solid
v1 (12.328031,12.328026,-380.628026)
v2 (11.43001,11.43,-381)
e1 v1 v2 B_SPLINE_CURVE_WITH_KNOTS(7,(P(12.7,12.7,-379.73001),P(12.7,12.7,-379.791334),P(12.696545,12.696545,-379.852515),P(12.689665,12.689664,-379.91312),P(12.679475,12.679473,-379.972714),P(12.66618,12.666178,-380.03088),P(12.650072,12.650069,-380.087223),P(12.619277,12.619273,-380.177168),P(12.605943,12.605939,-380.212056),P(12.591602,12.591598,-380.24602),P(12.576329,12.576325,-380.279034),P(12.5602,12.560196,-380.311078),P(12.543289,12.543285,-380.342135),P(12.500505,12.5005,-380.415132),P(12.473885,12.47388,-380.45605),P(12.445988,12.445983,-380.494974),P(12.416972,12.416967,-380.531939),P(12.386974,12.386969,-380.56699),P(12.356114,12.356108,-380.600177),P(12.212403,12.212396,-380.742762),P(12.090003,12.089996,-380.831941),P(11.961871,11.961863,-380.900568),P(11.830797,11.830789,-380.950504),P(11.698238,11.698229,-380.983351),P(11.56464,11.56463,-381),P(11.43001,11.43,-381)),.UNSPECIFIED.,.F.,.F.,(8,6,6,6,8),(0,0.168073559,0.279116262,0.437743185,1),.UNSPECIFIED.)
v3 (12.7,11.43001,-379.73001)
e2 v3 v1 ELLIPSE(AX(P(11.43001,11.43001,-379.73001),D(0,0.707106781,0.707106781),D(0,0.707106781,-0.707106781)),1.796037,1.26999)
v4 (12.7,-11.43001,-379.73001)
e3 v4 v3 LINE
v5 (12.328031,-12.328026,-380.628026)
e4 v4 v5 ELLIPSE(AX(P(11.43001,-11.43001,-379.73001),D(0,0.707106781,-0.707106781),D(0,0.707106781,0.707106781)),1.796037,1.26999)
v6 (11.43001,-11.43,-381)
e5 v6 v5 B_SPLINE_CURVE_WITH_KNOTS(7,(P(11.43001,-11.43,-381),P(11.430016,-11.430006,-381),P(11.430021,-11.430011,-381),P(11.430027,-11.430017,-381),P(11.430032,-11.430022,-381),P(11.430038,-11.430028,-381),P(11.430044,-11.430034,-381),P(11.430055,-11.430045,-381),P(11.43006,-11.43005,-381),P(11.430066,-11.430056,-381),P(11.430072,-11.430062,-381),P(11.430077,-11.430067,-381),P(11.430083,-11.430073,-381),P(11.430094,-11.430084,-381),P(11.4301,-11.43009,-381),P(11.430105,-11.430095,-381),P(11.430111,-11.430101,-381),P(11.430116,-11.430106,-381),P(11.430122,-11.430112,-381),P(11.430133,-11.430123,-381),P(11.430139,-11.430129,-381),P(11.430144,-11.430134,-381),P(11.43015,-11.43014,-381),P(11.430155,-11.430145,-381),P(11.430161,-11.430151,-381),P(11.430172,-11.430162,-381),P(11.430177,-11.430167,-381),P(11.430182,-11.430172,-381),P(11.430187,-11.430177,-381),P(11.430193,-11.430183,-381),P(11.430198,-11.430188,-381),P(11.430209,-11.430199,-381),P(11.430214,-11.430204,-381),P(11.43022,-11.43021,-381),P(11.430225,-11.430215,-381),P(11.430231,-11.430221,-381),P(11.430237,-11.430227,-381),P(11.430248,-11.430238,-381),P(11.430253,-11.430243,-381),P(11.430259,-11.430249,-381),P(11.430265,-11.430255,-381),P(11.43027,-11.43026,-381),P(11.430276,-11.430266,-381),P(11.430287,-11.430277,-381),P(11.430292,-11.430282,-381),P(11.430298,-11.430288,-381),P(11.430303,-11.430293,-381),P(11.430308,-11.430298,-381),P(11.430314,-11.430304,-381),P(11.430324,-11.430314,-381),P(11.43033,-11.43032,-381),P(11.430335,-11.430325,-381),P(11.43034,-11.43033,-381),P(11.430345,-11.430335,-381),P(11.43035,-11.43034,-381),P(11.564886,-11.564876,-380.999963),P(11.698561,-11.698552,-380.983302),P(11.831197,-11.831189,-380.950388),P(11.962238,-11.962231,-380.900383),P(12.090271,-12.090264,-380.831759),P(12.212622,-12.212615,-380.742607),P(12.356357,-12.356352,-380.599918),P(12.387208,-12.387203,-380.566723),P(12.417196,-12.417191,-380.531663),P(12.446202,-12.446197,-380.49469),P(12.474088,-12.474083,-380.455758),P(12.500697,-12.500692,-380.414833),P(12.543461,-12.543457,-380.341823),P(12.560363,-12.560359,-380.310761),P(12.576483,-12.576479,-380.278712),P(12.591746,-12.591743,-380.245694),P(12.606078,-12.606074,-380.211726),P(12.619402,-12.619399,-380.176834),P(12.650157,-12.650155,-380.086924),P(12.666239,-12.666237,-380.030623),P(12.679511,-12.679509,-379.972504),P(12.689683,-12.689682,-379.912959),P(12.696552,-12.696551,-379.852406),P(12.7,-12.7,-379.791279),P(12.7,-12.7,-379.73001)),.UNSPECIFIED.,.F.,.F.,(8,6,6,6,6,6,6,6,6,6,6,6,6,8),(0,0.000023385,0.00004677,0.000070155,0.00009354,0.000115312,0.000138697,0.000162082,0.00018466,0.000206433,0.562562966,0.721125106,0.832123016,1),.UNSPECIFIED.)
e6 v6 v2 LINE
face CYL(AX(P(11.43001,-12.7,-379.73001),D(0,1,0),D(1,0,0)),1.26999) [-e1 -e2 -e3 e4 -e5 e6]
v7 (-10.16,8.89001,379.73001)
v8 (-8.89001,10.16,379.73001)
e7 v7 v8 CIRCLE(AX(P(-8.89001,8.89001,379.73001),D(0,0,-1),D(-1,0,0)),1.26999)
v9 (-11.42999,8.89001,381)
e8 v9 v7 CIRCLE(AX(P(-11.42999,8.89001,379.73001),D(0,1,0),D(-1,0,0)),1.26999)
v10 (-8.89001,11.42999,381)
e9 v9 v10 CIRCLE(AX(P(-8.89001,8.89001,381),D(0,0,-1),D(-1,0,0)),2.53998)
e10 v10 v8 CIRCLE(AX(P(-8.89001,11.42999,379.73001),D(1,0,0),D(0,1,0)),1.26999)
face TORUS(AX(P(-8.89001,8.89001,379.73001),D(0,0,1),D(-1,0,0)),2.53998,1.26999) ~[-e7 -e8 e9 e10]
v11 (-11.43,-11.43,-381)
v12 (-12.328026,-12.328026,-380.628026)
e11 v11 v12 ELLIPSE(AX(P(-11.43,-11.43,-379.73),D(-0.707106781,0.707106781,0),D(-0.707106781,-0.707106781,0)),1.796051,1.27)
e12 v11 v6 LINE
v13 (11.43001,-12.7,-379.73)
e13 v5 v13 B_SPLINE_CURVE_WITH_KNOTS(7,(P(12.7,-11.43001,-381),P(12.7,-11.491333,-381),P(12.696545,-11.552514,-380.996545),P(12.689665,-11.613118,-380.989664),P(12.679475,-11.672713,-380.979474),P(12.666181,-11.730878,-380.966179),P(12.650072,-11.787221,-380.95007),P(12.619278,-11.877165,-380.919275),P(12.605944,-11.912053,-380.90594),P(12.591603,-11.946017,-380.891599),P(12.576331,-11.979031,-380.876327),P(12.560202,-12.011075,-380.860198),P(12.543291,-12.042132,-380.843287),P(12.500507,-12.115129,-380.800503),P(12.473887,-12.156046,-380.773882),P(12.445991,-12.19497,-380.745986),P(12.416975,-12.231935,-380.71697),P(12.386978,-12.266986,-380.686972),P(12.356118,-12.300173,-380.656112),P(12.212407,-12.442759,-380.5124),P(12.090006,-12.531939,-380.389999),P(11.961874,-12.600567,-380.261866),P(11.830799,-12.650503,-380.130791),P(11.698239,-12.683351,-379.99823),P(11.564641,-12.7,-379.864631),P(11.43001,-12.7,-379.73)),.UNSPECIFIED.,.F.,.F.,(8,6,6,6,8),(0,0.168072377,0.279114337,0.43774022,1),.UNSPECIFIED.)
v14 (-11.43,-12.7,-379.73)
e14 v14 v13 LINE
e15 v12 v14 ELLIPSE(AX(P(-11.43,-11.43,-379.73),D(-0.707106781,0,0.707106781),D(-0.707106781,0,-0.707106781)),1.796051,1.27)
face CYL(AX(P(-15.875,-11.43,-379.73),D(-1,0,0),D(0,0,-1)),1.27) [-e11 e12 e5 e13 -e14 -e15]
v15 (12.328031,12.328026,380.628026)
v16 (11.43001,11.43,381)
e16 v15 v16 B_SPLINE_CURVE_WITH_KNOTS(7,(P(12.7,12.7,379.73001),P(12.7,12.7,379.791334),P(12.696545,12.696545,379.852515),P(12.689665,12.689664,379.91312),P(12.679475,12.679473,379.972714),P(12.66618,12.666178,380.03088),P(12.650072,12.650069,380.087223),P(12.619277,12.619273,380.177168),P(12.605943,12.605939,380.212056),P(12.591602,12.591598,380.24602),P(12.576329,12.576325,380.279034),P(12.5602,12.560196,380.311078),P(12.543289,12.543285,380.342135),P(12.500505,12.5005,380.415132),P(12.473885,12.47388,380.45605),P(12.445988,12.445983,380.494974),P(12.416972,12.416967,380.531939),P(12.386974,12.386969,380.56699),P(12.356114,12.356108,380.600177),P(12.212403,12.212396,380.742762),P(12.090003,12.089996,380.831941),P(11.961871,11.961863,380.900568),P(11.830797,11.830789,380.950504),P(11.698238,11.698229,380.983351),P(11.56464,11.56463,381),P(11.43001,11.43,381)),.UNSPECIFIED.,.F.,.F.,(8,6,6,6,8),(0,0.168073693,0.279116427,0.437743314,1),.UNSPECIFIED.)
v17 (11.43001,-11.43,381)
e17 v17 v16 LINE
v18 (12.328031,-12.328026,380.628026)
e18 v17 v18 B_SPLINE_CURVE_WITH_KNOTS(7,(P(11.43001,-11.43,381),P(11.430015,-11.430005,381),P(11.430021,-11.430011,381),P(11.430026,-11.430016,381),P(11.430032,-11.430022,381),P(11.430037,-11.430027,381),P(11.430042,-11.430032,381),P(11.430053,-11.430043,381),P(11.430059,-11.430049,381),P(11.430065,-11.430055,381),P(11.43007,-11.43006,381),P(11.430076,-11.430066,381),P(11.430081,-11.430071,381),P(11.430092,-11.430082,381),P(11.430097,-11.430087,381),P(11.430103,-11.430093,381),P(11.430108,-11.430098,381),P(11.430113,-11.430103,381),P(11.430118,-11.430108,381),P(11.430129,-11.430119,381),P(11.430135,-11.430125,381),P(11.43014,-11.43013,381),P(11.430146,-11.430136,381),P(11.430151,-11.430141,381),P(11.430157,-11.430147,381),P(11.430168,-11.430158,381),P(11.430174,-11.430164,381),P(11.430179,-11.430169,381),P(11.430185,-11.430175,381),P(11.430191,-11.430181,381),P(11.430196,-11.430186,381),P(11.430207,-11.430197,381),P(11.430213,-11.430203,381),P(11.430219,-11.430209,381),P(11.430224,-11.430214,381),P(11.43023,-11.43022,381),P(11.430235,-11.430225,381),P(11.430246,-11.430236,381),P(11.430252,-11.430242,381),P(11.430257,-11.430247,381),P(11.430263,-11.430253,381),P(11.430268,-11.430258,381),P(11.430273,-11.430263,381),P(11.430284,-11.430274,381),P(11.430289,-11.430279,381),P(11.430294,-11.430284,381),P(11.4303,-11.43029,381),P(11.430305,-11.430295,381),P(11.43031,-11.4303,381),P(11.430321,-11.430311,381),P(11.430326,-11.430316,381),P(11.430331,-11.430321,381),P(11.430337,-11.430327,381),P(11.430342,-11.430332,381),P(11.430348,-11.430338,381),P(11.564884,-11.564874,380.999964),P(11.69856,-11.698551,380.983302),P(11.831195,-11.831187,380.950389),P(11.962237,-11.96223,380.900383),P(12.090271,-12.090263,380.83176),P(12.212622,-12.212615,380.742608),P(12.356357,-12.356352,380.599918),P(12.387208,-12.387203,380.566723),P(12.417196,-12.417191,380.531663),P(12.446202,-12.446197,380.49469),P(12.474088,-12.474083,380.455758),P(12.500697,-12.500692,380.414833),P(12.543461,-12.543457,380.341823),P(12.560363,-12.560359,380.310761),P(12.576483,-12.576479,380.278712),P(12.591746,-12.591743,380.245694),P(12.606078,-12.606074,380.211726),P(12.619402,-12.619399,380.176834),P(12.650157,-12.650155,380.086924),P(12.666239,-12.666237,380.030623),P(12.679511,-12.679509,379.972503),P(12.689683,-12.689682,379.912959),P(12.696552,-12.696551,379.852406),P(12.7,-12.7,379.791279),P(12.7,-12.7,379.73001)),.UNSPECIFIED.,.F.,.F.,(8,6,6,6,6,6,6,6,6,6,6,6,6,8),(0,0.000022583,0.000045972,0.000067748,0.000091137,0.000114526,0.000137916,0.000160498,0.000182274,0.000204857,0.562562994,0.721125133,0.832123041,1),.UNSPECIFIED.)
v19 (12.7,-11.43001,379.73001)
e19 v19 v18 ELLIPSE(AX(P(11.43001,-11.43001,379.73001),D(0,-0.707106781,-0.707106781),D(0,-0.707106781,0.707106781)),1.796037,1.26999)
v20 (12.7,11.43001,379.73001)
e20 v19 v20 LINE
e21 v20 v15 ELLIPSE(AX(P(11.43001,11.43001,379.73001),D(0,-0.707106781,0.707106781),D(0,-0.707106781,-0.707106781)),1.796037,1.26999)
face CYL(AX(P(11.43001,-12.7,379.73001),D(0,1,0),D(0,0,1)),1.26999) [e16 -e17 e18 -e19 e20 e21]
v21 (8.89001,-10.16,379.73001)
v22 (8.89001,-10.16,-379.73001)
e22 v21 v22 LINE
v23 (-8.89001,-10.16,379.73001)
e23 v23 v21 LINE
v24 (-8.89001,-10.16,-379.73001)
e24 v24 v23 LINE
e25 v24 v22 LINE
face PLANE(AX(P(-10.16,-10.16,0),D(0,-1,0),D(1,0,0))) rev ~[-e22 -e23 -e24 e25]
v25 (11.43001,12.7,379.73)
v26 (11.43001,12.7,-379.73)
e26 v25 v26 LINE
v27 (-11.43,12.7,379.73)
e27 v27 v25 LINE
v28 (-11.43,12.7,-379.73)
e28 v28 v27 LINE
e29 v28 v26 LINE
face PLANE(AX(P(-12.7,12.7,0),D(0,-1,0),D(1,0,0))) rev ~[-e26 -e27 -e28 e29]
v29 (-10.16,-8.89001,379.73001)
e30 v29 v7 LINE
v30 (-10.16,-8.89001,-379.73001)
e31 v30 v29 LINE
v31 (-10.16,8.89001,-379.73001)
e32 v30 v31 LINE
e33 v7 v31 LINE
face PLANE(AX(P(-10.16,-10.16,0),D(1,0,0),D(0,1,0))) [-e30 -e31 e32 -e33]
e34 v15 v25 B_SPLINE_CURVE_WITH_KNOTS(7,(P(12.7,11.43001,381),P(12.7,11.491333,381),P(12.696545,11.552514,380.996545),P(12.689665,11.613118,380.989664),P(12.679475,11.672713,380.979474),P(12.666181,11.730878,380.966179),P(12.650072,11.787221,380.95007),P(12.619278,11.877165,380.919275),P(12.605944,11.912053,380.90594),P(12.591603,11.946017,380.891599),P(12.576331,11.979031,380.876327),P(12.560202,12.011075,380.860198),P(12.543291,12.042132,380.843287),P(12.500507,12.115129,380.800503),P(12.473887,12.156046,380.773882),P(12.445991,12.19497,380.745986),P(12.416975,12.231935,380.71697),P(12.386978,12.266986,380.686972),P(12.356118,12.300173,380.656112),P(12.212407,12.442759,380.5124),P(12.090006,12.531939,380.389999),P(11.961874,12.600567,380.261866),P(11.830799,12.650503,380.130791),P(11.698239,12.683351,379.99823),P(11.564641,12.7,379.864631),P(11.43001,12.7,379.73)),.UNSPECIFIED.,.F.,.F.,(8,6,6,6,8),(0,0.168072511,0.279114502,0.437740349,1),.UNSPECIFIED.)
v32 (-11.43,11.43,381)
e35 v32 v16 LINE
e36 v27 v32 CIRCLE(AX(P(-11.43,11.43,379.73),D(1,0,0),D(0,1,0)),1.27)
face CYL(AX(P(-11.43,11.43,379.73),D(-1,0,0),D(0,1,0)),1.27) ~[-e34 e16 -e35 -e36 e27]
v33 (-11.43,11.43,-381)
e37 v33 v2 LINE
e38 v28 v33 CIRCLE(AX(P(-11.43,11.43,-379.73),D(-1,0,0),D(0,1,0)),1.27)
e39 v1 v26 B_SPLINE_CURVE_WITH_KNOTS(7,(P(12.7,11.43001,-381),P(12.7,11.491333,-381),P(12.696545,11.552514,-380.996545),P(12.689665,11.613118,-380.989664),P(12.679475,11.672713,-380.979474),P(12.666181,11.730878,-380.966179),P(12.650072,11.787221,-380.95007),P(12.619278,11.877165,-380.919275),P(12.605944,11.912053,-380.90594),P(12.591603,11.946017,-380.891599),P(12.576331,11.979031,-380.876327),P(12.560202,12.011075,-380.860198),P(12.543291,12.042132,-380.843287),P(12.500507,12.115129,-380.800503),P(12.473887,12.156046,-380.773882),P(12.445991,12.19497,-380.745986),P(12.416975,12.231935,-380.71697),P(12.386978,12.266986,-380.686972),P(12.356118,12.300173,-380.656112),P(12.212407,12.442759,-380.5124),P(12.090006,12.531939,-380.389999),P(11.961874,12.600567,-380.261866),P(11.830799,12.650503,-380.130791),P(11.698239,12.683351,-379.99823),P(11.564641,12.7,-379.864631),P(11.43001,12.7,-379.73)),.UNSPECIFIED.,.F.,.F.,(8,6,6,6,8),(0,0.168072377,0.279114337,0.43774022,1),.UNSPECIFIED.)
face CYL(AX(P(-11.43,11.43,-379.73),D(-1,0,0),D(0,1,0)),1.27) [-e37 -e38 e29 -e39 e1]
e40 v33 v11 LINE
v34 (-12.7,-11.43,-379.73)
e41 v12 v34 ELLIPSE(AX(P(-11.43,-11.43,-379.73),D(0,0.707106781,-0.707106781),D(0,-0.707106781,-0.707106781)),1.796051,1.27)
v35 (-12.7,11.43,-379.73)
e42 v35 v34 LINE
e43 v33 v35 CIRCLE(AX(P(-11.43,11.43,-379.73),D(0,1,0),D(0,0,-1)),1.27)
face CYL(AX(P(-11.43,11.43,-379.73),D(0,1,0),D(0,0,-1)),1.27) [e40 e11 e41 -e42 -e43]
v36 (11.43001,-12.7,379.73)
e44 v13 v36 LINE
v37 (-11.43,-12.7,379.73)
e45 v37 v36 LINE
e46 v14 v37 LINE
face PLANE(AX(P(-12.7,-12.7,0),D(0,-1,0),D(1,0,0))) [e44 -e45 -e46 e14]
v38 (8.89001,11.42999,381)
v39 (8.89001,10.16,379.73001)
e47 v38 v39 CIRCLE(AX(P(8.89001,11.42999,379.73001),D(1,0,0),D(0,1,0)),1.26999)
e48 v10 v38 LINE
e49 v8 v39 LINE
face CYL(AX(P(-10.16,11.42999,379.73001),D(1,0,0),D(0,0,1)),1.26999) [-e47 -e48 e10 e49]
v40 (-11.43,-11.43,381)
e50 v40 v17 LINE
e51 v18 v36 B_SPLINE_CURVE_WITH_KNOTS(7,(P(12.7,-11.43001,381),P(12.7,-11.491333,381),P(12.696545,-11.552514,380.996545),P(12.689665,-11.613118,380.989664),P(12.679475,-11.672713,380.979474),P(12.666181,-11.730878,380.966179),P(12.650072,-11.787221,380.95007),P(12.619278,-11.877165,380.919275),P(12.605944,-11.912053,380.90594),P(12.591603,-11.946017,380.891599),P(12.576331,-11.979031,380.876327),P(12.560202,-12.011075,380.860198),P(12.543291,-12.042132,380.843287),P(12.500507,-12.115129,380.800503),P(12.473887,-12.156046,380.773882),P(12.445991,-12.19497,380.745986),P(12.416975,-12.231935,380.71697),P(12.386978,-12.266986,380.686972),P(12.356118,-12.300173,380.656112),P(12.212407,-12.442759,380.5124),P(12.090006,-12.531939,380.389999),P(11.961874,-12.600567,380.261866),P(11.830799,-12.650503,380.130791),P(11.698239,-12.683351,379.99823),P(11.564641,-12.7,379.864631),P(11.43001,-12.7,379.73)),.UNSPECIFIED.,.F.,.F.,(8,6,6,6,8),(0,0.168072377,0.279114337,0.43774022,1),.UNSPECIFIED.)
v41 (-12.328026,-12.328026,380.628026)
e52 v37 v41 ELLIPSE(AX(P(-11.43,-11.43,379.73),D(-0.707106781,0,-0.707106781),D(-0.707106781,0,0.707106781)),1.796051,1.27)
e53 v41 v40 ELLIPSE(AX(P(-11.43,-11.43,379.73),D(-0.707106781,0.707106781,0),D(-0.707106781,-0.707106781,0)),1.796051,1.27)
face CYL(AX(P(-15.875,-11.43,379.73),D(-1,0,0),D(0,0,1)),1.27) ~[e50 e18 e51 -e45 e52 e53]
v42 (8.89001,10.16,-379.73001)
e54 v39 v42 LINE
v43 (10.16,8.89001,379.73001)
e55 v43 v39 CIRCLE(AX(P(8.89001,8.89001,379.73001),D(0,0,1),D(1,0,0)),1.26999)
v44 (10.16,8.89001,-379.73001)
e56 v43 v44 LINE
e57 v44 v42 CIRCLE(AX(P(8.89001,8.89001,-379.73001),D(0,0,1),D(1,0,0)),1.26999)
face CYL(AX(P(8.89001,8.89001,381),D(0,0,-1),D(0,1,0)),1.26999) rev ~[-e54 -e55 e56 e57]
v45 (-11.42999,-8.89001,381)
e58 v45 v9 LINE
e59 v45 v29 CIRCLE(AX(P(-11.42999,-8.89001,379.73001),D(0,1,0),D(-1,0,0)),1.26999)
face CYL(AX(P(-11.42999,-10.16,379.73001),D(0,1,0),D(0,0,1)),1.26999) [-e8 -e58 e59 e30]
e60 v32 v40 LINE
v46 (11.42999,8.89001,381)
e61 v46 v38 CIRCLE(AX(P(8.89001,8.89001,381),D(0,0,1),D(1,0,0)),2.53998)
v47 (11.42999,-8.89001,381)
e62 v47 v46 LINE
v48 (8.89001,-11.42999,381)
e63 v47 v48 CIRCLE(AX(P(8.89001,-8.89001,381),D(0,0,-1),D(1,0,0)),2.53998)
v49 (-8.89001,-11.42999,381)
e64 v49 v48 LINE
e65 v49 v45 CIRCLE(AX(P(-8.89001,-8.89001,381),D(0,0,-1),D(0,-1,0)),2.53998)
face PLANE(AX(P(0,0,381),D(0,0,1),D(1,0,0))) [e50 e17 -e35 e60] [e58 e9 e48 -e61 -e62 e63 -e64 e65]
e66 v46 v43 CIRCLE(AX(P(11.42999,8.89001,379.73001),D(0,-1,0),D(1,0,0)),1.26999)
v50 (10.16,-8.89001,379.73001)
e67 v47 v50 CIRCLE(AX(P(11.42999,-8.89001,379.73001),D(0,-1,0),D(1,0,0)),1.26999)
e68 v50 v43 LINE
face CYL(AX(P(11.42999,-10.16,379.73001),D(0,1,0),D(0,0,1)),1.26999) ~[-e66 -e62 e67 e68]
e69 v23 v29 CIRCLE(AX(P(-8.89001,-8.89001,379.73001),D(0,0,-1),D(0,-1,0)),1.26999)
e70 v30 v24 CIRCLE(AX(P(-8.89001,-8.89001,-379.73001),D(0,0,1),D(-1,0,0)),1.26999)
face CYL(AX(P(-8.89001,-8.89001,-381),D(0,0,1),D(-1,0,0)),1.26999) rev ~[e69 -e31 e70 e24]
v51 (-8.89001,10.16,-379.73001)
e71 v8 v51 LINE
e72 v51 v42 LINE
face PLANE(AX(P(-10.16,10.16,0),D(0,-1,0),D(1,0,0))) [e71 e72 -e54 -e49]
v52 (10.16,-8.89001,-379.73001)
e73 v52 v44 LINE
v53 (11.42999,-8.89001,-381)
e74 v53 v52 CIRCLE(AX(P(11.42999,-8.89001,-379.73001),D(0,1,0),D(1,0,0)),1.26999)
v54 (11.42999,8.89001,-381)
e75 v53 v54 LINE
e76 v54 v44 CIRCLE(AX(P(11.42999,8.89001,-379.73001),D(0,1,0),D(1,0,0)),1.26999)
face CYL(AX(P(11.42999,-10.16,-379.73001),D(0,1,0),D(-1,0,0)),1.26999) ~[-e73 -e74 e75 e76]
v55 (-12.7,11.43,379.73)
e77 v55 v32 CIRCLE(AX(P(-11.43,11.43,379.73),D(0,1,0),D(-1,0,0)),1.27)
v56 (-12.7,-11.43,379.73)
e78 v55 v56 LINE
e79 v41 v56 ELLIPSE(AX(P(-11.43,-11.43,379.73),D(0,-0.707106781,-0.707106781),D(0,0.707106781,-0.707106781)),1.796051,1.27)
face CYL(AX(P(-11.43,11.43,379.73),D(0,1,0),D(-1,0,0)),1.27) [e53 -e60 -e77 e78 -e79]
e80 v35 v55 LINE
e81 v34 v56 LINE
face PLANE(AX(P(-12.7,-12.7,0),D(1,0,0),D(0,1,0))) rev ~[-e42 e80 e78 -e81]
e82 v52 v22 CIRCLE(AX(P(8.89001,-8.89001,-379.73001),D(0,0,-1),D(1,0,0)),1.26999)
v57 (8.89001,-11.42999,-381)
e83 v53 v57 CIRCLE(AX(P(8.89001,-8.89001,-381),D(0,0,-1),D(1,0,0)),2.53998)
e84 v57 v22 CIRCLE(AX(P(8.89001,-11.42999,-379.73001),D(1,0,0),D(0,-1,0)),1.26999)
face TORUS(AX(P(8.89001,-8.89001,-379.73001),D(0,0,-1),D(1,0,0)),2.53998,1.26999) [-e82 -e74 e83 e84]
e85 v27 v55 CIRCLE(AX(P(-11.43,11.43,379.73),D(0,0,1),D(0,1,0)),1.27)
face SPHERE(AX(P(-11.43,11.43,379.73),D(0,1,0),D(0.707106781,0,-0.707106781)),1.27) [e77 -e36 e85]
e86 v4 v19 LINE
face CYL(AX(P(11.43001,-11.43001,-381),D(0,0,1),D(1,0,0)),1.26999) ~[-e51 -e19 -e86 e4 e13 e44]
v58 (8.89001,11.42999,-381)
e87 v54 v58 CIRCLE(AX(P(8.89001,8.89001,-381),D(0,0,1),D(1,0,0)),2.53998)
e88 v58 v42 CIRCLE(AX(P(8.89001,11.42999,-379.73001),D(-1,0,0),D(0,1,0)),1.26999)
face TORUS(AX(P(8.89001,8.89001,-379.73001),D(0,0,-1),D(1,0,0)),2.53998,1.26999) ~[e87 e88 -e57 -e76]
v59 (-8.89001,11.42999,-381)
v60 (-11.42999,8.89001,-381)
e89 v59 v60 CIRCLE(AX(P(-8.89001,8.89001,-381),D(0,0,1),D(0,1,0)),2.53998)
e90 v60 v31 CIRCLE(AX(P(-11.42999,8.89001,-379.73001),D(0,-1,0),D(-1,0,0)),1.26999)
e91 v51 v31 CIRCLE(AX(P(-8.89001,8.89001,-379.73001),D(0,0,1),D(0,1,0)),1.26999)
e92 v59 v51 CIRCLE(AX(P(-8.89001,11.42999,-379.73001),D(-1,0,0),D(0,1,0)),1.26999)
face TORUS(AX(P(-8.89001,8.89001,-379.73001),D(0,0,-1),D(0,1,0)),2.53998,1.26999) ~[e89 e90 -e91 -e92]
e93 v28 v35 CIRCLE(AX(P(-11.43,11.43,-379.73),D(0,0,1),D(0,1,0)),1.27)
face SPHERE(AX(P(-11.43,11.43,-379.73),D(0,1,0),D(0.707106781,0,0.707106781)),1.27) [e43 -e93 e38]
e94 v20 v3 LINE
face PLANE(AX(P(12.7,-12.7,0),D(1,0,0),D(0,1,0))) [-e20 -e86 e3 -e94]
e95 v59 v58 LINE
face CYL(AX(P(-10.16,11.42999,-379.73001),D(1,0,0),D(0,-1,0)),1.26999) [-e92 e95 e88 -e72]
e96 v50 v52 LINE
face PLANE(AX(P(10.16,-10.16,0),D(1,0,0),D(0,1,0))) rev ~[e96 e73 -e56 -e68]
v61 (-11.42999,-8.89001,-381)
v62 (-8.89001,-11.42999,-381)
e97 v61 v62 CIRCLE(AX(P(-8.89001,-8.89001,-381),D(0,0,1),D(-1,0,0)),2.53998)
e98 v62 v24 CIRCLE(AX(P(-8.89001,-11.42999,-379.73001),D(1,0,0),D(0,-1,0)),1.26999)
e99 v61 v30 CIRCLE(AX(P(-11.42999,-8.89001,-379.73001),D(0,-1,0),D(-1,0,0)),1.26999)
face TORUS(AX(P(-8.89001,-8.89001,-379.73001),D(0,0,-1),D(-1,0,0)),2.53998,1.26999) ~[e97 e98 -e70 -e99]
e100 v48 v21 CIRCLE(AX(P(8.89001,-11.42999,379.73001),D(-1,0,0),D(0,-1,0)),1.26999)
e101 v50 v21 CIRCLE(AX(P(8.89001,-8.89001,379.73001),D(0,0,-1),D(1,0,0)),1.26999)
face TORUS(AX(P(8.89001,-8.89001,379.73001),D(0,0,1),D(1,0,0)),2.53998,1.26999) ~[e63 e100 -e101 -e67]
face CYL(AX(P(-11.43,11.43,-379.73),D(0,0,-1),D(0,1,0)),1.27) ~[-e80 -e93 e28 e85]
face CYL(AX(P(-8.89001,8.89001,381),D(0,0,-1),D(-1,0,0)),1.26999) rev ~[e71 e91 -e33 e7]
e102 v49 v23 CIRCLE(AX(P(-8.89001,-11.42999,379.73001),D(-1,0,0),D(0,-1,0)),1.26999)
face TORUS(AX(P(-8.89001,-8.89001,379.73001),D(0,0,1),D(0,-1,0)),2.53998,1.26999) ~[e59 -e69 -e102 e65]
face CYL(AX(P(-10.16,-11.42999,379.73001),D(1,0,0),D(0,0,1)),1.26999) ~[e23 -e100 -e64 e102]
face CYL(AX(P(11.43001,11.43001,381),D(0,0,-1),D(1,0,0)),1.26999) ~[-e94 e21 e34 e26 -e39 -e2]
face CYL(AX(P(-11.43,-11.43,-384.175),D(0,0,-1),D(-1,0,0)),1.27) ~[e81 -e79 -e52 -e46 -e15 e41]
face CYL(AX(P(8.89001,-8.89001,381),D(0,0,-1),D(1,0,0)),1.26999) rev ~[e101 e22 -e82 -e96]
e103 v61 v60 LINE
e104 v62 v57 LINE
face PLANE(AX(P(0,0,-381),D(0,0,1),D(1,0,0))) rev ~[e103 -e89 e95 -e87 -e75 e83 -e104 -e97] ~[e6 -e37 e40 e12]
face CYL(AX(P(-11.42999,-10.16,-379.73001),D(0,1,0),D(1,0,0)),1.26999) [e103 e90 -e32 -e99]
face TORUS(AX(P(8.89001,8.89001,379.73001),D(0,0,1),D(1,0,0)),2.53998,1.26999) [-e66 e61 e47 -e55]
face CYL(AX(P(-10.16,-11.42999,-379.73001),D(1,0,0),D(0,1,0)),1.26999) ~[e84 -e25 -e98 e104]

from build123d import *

# Parameters (mm, degrees)
F0_W         = 25.4
F0_H         = 25.4
F0_W_2       = 20.32
F0_H_2       = 20.32
F1_DEPTH     = 381
F2_R         = 1.26999
F3_T1_DEPTH  = 30.48001
F3_T3_DEPTH  = 768.35
F4_T1_DEPTH  = 26.03501
F4_T3_DEPTH  = 759.46
F4_T5_DEPTH  = 26.035
F4_S9_W      = 1.2954
F4_S9_H      = 1.2954
F4_T10_DEPTH = 1.2954
F4_S15_W     = 1.2954
F4_S15_H     = 1.2954
F4_T16_DEPTH = 1.2954


# Not quite as in the source:
# - a fillet or chamfer that OpenCascade refuses, or shapes differently, is made with other operations: its cross-section is extruded or revolved along the edge and cut away or added
# - a fillet or chamfer is up to 0.001 mm smaller than in the source, because OpenCascade refuses the exact size


with BuildPart() as f1:
    # F0 (on Top) → F1 (new body, symmetric)
    with BuildSketch(Plane.XY):
        Rectangle(F0_W, F0_H)
        Rectangle(F0_W_2, F0_H_2, mode=Mode.SUBTRACT)
    extrude(amount=F1_DEPTH, both=True)

    # F2 (radius 1.27 in the source; OpenCascade refuses exactly that, so slightly less here)
    f2_edges = [f1.edges().sort_by_distance(p)[0] for p in [
        (0, -10.16, -381),
        (-10.16, -10.16, 0),
        (0, -10.16, 381),
        (10.16, -10.16, 0),
        (10.16, 10.16, 0),
        (10.16, 0, -381),
        (10.16, 0, 381),
        (-10.16, 0, -381),
        (-10.16, 10.16, 0),
        (-10.16, 0, 381),
        (0, 10.16, -381),
        (0, 10.16, 381),
        (12.7, -12.7, 0),
        (12.7, 0, -381),
        (12.7, 12.7, 0),
        (12.7, 0, 381),
    ]]
    fillet(f2_edges, radius=F2_R)

    # F3: fillet of radius 1.27 on 8 edges, made by hand

    # F3_s2 → F3_t1 (cut)
    with BuildSketch(Plane.YZ.offset(-15.875)):
        with BuildLine():
            ThreePointArc((-11.43, -381), (-12.3280256121, -380.6280256121), (-12.7, -379.73))
            Line((-12.7, -379.73), (-12.7, -381))
            Line((-12.7, -381), (-11.43, -381))
        make_face()
        with BuildLine():
            ThreePointArc((-11.43, 381), (-12.3280256121, 380.6280256121), (-12.7, 379.73))
            Line((-12.7, 379.73), (-12.7, 381))
            Line((-12.7, 381), (-11.43, 381))
        make_face()
    extrude(amount=F3_T1_DEPTH, mode=Mode.SUBTRACT)

    # F3_s4 → F3_t3 (cut)
    with BuildSketch(Plane.XY.offset(-384.175)):
        with BuildLine():
            ThreePointArc((-12.7, -11.43), (-12.3280256121, -12.3280256121), (-11.43, -12.7))
            Line((-11.43, -12.7), (-12.7, -12.7))
            Line((-12.7, -12.7), (-12.7, -11.43))
        make_face()
    extrude(amount=F3_T3_DEPTH, mode=Mode.SUBTRACT)

    # F4: fillet of radius 1.27 on 7 edges, made by hand

    # F4_s2 → F4_t1 (cut)
    with BuildSketch(Plane.YZ.offset(-11.43)):
        with BuildLine():
            ThreePointArc((12.7, -379.73), (12.3280256121, -380.6280256121), (11.43, -381))
            Line((11.43, -381), (12.7, -381))
            Line((12.7, -381), (12.7, -379.73))
        make_face()
        with BuildLine():
            ThreePointArc((12.7, 379.73), (12.3280256121, 380.6280256121), (11.43, 381))
            Line((11.43, 381), (12.7, 381))
            Line((12.7, 381), (12.7, 379.73))
        make_face()
    extrude(amount=F4_T1_DEPTH, mode=Mode.SUBTRACT)

    # F4_s4 → F4_t3 (cut)
    with BuildSketch(Plane.XY.offset(-379.73)):
        with BuildLine():
            ThreePointArc((-11.43, 12.7), (-12.3280256121, 12.3280256121), (-12.7, 11.43))
            Line((-12.7, 11.43), (-12.7, 12.7))
            Line((-12.7, 12.7), (-11.43, 12.7))
        make_face()
    extrude(amount=F4_T3_DEPTH, mode=Mode.SUBTRACT)

    # F4_s6 → F4_t5 (cut)
    with BuildSketch(Plane.XZ.offset(-11.43)):
        with BuildLine():
            ThreePointArc((-12.7, 379.73), (-12.3280256121, 380.6280256121), (-11.43, 381))
            Line((-11.43, 381), (-12.7, 381))
            Line((-12.7, 381), (-12.7, 379.73))
        make_face()
        with BuildLine():
            ThreePointArc((-11.43, -381), (-12.3280256121, -380.6280256121), (-12.7, -379.73))
            Line((-12.7, -379.73), (-12.7, -381))
            Line((-12.7, -381), (-11.43, -381))
        make_face()
    extrude(amount=F4_T5_DEPTH, mode=Mode.SUBTRACT)


with BuildPart() as f4_tool8:
    # F4_s9 → F4_t10 (new body)
    with BuildSketch(Plane.XZ.offset(-11.43)):
        with Locations((-12.0777, -380.3777)):
            Rectangle(F4_S9_W, F4_S9_H)
    extrude(amount=-F4_T10_DEPTH)

    # F4_s11 → F4_t12 (revolve, cut)
    with BuildSketch(Plane(origin=(-11.43, 11.43, -379.73), x_dir=(0.7071067812, 0, 0.7071067812), z_dir=(-0.7071067812, 0, 0.7071067812))):
        with BuildLine():
            ThreePointArc((0, -1.27), (1.27, 0), (0, 1.27))
            Line((0, 1.27), (0, -1.27))
        make_face()
    revolve(axis=Axis((-11.43, 11.43, -379.73), (0, 1, 0)), mode=Mode.SUBTRACT)


with BuildPart() as f1_1:
    add(f1.part)

    # F4_t7: cut F4_tool8
    add(f4_tool8.part, mode=Mode.SUBTRACT)


with BuildPart() as f4_tool14:
    # F4_s15 → F4_t16 (new body)
    with BuildSketch(Plane.XZ.offset(-11.43)):
        with Locations((-12.0777, 380.3777)):
            Rectangle(F4_S15_W, F4_S15_H)
    extrude(amount=-F4_T16_DEPTH)

    # F4_s17 → F4_t18 (revolve, cut)
    with BuildSketch(Plane(origin=(-11.43, 11.43, 379.73), x_dir=(0.7071067812, 0, -0.7071067812), z_dir=(0.7071067812, 0, 0.7071067812))):
        with BuildLine():
            ThreePointArc((0, -1.27), (1.27, 0), (0, 1.27))
            Line((0, 1.27), (0, -1.27))
        make_face()
    revolve(axis=Axis((-11.43, 11.43, 379.73), (0, 1, 0)), mode=Mode.SUBTRACT)


with BuildPart() as f1_2:
    add(f1_1.part)

    # F4_t13: cut F4_tool14
    add(f4_tool14.part, mode=Mode.SUBTRACT)


solid = f1_2.part
